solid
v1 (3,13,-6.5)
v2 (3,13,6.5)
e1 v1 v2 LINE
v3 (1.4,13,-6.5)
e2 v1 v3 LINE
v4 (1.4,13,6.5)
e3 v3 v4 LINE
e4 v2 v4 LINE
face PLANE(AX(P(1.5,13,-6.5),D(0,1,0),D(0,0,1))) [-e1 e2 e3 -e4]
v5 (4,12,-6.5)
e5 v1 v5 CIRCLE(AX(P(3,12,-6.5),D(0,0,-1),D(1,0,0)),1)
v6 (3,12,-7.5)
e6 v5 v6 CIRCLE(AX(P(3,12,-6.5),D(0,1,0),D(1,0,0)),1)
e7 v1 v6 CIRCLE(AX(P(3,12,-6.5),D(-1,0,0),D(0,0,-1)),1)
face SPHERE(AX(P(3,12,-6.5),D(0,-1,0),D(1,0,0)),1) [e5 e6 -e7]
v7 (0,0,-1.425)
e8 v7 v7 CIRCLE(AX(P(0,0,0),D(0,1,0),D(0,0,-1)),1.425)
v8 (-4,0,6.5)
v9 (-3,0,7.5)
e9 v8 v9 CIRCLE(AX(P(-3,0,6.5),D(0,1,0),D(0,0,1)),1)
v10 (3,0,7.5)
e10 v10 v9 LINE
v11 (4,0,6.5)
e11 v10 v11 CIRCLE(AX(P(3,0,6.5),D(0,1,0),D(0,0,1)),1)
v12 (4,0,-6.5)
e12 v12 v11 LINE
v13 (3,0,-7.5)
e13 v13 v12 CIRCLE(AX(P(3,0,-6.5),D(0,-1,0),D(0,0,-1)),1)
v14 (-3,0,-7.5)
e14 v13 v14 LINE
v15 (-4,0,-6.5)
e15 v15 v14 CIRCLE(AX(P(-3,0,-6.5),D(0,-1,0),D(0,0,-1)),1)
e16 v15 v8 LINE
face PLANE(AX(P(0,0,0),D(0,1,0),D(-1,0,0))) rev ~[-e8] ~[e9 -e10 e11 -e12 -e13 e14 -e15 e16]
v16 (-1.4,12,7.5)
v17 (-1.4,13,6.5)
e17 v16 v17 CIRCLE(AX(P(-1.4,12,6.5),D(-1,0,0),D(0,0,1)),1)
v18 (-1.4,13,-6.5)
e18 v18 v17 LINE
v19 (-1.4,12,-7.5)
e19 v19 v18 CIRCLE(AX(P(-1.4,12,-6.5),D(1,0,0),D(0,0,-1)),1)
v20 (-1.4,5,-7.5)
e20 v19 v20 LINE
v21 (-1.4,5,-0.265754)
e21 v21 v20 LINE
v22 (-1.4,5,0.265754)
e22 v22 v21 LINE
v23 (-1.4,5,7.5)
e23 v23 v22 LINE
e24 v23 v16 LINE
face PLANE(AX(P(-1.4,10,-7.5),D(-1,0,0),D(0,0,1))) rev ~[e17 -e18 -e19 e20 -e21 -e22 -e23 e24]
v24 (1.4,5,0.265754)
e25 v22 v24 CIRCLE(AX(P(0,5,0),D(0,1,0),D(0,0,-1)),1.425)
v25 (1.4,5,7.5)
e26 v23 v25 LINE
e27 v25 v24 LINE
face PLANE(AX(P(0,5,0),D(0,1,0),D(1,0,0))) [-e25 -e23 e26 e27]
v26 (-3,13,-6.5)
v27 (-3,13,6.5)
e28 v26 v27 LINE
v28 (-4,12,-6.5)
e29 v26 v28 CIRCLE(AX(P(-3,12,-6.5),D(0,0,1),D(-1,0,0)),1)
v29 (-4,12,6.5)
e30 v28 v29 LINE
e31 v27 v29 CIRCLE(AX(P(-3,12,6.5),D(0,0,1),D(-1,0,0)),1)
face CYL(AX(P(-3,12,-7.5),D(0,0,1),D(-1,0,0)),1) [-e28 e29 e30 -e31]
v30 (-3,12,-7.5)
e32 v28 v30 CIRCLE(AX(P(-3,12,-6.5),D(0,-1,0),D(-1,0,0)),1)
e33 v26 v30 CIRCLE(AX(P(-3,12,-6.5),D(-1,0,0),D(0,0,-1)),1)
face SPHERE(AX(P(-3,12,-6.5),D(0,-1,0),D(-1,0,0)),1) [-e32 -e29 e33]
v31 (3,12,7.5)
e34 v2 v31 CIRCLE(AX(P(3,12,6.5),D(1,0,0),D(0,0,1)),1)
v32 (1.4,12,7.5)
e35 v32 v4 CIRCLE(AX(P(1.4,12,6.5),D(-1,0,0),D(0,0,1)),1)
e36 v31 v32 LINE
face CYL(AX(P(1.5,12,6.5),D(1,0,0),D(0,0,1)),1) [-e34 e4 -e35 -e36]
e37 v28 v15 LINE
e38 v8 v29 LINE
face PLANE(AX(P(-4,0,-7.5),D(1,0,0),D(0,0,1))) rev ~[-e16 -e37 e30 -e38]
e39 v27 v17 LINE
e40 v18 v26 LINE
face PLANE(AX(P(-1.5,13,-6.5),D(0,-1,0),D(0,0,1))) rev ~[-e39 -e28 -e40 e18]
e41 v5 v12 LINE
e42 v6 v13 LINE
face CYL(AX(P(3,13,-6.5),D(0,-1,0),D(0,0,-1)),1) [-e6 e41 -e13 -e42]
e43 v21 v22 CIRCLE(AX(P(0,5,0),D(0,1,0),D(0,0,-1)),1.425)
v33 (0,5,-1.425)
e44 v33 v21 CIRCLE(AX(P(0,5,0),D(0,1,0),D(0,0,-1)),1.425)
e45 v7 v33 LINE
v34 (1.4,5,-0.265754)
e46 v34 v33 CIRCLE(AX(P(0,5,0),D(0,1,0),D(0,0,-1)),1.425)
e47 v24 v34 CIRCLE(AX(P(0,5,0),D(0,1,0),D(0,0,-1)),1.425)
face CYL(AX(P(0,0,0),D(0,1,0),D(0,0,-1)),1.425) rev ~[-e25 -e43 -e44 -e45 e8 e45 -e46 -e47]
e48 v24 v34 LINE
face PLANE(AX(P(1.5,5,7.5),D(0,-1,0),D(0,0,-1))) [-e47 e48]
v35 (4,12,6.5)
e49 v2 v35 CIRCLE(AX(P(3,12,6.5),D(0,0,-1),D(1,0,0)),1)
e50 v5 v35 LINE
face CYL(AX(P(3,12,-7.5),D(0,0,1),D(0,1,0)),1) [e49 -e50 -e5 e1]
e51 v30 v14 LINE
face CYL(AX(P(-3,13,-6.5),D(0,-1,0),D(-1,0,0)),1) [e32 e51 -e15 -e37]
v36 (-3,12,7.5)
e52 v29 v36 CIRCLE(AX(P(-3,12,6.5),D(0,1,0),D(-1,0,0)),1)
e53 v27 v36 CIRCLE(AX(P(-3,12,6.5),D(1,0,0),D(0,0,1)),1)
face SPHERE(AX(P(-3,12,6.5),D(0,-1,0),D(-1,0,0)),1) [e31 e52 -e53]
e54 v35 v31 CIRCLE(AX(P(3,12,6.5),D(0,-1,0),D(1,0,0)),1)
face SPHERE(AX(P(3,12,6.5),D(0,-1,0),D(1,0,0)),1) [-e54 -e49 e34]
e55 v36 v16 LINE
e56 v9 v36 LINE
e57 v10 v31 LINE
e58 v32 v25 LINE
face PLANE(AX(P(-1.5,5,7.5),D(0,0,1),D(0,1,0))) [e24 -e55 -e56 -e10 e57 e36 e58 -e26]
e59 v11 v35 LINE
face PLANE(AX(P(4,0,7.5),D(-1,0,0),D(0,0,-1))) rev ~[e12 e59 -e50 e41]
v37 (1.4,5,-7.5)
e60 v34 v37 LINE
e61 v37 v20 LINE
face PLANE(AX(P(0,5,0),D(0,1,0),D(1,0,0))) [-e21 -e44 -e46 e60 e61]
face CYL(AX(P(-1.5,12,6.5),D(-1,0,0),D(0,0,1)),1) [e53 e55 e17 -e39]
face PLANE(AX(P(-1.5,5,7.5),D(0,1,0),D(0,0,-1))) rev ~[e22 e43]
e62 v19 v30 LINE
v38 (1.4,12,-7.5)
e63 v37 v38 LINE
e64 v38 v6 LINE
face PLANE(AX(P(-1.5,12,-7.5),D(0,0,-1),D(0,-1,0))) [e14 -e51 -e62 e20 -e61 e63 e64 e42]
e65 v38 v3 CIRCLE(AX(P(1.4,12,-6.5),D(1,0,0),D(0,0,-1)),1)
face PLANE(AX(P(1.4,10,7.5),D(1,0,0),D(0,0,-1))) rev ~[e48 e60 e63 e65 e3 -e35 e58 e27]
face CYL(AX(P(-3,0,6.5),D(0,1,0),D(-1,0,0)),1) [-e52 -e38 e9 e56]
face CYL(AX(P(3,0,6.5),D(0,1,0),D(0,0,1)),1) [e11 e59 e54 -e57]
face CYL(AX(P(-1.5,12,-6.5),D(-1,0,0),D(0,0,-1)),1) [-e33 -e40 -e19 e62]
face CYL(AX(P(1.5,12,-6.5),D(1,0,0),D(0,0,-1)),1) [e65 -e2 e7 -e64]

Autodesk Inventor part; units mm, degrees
ref_plane "YZ Plane" through (0, 0, 0) normal (1, 0, 0) x (0, 1, 0)
ref_plane "XZ Plane" through (0, 0, 0) normal (0, 1, 0) x (-1, 0, 0)
ref_plane "XY Plane" through (0, 0, 0) normal (0, 0, 1) x (1, 0, 0)
sketch "Sketch1" plane through (0, 0, 0) normal (0, 1, 0) x (-1, 0, 0)
  line L0 (4, 7.5) -> (-4, 7.5)
  line L1 (-4, 7.5) -> (-4, -7.5)
  line L2 (-4, -7.5) -> (4, -7.5)
  line L3 (4, -7.5) -> (4, 7.5)
  line L4 (4, 7.5) -> (-4, -7.5) construction
  line L5 (-4, 7.5) -> (4, -7.5) construction
  point P0 (0, 0)
  dimension "d0" = 8
  dimension "d1" = 15
extrude "Extrusion1" add sketch "Sketch1" along normal blind 10
sketch "Sketch2" plane through (0, 10, 0) normal (0, 1, 0) x (1, 0, 0)
  line L0 (4, 7.5) -> (-4, 7.5) projected
  line L1 (-1.5, -7.5) -> (1.5, -7.5)
  line L2 (1.5, -7.5) -> (1.5, 7.5)
  line L3 (1.5, 7.5) -> (-1.5, 7.5)
  line L4 (-1.5, 7.5) -> (-1.5, -7.5)
  line L5 (-1.5, -7.5) -> (1.5, 7.5) construction
  line L6 (1.5, -7.5) -> (-1.5, 7.5) construction
  point P0 (0, 0)
  dimension "d4" = 3
extrude "Extrusion2" cut sketch "Sketch2" against normal blind 5
thicken "Thicken1" operation add thickness 2 both sides no extend neighbours yes toward (0, 1, 0) faces at (2.3333, 10, -2.5)
thicken "Thicken2" operation add thickness 2 both sides no extend neighbours yes toward (0, 1, 0) faces at (-3.1667, 10, -2.5)
thicken "Thicken3" operation add thickness 1 both sides no extend neighbours yes toward (0, 1, 0) faces at (-3.1667, 12, -2.5)
thicken "Thicken4" operation add thickness 1 both sides no extend neighbours yes toward (0, 1, 0) faces at (3.1667, 12, 2.5)
fillet "Fillet1" radius 1 10 edges at (4, 6.5, 7.5) (4, 6.5, -7.5) (-4, 6.5, 7.5) (-4, 6.5, -7.5) (4, 13, 0) (-4, 13, 0) (2.75, 13, -7.5) (2.75, 13, 7.5) (-2.75, 13, 7.5) (-2.75, 13, -7.5)
sketch "Sketch3" plane through (0, 0, 0) normal (0, -1, 0) x (1, 0, 0)
  arc A0 (-3, 7.5) -> (-4, 6.5) centre (-3, 6.5) ccw construction
  line L0 (-4, -6.5) -> (-4, 6.5) construction
  arc A1 (-4, -6.5) -> (-3, -7.5) centre (-3, -6.5) ccw construction
  line L1 (3, -7.5) -> (-3, -7.5) construction
  arc A2 (3, -7.5) -> (4, -6.5) centre (3, -6.5) ccw construction
  line L2 (4, 6.5) -> (4, -6.5) construction
  arc A3 (4, 6.5) -> (3, 7.5) centre (3, 6.5) ccw construction
  line L3 (-3, 7.5) -> (3, 7.5) construction
  point P0 (0, 0)
  point P1 (0, 0)
hole "Hole1" at (0, 0, 0) direction (0, 1, 0) diameter 2.85 depth 5
thicken "Thicken7" operation add thickness 0.1 both sides no extend neighbours yes toward (-1, 0, 0) faces at (1.5, 7.6667, -2.1667)
thicken "Thicken8" operation add thickness 0.1 both sides no extend neighbours yes toward (1, 0, 0) faces at (-1.5, 7.6667, 2.1667)
properties part number "zoffset"
